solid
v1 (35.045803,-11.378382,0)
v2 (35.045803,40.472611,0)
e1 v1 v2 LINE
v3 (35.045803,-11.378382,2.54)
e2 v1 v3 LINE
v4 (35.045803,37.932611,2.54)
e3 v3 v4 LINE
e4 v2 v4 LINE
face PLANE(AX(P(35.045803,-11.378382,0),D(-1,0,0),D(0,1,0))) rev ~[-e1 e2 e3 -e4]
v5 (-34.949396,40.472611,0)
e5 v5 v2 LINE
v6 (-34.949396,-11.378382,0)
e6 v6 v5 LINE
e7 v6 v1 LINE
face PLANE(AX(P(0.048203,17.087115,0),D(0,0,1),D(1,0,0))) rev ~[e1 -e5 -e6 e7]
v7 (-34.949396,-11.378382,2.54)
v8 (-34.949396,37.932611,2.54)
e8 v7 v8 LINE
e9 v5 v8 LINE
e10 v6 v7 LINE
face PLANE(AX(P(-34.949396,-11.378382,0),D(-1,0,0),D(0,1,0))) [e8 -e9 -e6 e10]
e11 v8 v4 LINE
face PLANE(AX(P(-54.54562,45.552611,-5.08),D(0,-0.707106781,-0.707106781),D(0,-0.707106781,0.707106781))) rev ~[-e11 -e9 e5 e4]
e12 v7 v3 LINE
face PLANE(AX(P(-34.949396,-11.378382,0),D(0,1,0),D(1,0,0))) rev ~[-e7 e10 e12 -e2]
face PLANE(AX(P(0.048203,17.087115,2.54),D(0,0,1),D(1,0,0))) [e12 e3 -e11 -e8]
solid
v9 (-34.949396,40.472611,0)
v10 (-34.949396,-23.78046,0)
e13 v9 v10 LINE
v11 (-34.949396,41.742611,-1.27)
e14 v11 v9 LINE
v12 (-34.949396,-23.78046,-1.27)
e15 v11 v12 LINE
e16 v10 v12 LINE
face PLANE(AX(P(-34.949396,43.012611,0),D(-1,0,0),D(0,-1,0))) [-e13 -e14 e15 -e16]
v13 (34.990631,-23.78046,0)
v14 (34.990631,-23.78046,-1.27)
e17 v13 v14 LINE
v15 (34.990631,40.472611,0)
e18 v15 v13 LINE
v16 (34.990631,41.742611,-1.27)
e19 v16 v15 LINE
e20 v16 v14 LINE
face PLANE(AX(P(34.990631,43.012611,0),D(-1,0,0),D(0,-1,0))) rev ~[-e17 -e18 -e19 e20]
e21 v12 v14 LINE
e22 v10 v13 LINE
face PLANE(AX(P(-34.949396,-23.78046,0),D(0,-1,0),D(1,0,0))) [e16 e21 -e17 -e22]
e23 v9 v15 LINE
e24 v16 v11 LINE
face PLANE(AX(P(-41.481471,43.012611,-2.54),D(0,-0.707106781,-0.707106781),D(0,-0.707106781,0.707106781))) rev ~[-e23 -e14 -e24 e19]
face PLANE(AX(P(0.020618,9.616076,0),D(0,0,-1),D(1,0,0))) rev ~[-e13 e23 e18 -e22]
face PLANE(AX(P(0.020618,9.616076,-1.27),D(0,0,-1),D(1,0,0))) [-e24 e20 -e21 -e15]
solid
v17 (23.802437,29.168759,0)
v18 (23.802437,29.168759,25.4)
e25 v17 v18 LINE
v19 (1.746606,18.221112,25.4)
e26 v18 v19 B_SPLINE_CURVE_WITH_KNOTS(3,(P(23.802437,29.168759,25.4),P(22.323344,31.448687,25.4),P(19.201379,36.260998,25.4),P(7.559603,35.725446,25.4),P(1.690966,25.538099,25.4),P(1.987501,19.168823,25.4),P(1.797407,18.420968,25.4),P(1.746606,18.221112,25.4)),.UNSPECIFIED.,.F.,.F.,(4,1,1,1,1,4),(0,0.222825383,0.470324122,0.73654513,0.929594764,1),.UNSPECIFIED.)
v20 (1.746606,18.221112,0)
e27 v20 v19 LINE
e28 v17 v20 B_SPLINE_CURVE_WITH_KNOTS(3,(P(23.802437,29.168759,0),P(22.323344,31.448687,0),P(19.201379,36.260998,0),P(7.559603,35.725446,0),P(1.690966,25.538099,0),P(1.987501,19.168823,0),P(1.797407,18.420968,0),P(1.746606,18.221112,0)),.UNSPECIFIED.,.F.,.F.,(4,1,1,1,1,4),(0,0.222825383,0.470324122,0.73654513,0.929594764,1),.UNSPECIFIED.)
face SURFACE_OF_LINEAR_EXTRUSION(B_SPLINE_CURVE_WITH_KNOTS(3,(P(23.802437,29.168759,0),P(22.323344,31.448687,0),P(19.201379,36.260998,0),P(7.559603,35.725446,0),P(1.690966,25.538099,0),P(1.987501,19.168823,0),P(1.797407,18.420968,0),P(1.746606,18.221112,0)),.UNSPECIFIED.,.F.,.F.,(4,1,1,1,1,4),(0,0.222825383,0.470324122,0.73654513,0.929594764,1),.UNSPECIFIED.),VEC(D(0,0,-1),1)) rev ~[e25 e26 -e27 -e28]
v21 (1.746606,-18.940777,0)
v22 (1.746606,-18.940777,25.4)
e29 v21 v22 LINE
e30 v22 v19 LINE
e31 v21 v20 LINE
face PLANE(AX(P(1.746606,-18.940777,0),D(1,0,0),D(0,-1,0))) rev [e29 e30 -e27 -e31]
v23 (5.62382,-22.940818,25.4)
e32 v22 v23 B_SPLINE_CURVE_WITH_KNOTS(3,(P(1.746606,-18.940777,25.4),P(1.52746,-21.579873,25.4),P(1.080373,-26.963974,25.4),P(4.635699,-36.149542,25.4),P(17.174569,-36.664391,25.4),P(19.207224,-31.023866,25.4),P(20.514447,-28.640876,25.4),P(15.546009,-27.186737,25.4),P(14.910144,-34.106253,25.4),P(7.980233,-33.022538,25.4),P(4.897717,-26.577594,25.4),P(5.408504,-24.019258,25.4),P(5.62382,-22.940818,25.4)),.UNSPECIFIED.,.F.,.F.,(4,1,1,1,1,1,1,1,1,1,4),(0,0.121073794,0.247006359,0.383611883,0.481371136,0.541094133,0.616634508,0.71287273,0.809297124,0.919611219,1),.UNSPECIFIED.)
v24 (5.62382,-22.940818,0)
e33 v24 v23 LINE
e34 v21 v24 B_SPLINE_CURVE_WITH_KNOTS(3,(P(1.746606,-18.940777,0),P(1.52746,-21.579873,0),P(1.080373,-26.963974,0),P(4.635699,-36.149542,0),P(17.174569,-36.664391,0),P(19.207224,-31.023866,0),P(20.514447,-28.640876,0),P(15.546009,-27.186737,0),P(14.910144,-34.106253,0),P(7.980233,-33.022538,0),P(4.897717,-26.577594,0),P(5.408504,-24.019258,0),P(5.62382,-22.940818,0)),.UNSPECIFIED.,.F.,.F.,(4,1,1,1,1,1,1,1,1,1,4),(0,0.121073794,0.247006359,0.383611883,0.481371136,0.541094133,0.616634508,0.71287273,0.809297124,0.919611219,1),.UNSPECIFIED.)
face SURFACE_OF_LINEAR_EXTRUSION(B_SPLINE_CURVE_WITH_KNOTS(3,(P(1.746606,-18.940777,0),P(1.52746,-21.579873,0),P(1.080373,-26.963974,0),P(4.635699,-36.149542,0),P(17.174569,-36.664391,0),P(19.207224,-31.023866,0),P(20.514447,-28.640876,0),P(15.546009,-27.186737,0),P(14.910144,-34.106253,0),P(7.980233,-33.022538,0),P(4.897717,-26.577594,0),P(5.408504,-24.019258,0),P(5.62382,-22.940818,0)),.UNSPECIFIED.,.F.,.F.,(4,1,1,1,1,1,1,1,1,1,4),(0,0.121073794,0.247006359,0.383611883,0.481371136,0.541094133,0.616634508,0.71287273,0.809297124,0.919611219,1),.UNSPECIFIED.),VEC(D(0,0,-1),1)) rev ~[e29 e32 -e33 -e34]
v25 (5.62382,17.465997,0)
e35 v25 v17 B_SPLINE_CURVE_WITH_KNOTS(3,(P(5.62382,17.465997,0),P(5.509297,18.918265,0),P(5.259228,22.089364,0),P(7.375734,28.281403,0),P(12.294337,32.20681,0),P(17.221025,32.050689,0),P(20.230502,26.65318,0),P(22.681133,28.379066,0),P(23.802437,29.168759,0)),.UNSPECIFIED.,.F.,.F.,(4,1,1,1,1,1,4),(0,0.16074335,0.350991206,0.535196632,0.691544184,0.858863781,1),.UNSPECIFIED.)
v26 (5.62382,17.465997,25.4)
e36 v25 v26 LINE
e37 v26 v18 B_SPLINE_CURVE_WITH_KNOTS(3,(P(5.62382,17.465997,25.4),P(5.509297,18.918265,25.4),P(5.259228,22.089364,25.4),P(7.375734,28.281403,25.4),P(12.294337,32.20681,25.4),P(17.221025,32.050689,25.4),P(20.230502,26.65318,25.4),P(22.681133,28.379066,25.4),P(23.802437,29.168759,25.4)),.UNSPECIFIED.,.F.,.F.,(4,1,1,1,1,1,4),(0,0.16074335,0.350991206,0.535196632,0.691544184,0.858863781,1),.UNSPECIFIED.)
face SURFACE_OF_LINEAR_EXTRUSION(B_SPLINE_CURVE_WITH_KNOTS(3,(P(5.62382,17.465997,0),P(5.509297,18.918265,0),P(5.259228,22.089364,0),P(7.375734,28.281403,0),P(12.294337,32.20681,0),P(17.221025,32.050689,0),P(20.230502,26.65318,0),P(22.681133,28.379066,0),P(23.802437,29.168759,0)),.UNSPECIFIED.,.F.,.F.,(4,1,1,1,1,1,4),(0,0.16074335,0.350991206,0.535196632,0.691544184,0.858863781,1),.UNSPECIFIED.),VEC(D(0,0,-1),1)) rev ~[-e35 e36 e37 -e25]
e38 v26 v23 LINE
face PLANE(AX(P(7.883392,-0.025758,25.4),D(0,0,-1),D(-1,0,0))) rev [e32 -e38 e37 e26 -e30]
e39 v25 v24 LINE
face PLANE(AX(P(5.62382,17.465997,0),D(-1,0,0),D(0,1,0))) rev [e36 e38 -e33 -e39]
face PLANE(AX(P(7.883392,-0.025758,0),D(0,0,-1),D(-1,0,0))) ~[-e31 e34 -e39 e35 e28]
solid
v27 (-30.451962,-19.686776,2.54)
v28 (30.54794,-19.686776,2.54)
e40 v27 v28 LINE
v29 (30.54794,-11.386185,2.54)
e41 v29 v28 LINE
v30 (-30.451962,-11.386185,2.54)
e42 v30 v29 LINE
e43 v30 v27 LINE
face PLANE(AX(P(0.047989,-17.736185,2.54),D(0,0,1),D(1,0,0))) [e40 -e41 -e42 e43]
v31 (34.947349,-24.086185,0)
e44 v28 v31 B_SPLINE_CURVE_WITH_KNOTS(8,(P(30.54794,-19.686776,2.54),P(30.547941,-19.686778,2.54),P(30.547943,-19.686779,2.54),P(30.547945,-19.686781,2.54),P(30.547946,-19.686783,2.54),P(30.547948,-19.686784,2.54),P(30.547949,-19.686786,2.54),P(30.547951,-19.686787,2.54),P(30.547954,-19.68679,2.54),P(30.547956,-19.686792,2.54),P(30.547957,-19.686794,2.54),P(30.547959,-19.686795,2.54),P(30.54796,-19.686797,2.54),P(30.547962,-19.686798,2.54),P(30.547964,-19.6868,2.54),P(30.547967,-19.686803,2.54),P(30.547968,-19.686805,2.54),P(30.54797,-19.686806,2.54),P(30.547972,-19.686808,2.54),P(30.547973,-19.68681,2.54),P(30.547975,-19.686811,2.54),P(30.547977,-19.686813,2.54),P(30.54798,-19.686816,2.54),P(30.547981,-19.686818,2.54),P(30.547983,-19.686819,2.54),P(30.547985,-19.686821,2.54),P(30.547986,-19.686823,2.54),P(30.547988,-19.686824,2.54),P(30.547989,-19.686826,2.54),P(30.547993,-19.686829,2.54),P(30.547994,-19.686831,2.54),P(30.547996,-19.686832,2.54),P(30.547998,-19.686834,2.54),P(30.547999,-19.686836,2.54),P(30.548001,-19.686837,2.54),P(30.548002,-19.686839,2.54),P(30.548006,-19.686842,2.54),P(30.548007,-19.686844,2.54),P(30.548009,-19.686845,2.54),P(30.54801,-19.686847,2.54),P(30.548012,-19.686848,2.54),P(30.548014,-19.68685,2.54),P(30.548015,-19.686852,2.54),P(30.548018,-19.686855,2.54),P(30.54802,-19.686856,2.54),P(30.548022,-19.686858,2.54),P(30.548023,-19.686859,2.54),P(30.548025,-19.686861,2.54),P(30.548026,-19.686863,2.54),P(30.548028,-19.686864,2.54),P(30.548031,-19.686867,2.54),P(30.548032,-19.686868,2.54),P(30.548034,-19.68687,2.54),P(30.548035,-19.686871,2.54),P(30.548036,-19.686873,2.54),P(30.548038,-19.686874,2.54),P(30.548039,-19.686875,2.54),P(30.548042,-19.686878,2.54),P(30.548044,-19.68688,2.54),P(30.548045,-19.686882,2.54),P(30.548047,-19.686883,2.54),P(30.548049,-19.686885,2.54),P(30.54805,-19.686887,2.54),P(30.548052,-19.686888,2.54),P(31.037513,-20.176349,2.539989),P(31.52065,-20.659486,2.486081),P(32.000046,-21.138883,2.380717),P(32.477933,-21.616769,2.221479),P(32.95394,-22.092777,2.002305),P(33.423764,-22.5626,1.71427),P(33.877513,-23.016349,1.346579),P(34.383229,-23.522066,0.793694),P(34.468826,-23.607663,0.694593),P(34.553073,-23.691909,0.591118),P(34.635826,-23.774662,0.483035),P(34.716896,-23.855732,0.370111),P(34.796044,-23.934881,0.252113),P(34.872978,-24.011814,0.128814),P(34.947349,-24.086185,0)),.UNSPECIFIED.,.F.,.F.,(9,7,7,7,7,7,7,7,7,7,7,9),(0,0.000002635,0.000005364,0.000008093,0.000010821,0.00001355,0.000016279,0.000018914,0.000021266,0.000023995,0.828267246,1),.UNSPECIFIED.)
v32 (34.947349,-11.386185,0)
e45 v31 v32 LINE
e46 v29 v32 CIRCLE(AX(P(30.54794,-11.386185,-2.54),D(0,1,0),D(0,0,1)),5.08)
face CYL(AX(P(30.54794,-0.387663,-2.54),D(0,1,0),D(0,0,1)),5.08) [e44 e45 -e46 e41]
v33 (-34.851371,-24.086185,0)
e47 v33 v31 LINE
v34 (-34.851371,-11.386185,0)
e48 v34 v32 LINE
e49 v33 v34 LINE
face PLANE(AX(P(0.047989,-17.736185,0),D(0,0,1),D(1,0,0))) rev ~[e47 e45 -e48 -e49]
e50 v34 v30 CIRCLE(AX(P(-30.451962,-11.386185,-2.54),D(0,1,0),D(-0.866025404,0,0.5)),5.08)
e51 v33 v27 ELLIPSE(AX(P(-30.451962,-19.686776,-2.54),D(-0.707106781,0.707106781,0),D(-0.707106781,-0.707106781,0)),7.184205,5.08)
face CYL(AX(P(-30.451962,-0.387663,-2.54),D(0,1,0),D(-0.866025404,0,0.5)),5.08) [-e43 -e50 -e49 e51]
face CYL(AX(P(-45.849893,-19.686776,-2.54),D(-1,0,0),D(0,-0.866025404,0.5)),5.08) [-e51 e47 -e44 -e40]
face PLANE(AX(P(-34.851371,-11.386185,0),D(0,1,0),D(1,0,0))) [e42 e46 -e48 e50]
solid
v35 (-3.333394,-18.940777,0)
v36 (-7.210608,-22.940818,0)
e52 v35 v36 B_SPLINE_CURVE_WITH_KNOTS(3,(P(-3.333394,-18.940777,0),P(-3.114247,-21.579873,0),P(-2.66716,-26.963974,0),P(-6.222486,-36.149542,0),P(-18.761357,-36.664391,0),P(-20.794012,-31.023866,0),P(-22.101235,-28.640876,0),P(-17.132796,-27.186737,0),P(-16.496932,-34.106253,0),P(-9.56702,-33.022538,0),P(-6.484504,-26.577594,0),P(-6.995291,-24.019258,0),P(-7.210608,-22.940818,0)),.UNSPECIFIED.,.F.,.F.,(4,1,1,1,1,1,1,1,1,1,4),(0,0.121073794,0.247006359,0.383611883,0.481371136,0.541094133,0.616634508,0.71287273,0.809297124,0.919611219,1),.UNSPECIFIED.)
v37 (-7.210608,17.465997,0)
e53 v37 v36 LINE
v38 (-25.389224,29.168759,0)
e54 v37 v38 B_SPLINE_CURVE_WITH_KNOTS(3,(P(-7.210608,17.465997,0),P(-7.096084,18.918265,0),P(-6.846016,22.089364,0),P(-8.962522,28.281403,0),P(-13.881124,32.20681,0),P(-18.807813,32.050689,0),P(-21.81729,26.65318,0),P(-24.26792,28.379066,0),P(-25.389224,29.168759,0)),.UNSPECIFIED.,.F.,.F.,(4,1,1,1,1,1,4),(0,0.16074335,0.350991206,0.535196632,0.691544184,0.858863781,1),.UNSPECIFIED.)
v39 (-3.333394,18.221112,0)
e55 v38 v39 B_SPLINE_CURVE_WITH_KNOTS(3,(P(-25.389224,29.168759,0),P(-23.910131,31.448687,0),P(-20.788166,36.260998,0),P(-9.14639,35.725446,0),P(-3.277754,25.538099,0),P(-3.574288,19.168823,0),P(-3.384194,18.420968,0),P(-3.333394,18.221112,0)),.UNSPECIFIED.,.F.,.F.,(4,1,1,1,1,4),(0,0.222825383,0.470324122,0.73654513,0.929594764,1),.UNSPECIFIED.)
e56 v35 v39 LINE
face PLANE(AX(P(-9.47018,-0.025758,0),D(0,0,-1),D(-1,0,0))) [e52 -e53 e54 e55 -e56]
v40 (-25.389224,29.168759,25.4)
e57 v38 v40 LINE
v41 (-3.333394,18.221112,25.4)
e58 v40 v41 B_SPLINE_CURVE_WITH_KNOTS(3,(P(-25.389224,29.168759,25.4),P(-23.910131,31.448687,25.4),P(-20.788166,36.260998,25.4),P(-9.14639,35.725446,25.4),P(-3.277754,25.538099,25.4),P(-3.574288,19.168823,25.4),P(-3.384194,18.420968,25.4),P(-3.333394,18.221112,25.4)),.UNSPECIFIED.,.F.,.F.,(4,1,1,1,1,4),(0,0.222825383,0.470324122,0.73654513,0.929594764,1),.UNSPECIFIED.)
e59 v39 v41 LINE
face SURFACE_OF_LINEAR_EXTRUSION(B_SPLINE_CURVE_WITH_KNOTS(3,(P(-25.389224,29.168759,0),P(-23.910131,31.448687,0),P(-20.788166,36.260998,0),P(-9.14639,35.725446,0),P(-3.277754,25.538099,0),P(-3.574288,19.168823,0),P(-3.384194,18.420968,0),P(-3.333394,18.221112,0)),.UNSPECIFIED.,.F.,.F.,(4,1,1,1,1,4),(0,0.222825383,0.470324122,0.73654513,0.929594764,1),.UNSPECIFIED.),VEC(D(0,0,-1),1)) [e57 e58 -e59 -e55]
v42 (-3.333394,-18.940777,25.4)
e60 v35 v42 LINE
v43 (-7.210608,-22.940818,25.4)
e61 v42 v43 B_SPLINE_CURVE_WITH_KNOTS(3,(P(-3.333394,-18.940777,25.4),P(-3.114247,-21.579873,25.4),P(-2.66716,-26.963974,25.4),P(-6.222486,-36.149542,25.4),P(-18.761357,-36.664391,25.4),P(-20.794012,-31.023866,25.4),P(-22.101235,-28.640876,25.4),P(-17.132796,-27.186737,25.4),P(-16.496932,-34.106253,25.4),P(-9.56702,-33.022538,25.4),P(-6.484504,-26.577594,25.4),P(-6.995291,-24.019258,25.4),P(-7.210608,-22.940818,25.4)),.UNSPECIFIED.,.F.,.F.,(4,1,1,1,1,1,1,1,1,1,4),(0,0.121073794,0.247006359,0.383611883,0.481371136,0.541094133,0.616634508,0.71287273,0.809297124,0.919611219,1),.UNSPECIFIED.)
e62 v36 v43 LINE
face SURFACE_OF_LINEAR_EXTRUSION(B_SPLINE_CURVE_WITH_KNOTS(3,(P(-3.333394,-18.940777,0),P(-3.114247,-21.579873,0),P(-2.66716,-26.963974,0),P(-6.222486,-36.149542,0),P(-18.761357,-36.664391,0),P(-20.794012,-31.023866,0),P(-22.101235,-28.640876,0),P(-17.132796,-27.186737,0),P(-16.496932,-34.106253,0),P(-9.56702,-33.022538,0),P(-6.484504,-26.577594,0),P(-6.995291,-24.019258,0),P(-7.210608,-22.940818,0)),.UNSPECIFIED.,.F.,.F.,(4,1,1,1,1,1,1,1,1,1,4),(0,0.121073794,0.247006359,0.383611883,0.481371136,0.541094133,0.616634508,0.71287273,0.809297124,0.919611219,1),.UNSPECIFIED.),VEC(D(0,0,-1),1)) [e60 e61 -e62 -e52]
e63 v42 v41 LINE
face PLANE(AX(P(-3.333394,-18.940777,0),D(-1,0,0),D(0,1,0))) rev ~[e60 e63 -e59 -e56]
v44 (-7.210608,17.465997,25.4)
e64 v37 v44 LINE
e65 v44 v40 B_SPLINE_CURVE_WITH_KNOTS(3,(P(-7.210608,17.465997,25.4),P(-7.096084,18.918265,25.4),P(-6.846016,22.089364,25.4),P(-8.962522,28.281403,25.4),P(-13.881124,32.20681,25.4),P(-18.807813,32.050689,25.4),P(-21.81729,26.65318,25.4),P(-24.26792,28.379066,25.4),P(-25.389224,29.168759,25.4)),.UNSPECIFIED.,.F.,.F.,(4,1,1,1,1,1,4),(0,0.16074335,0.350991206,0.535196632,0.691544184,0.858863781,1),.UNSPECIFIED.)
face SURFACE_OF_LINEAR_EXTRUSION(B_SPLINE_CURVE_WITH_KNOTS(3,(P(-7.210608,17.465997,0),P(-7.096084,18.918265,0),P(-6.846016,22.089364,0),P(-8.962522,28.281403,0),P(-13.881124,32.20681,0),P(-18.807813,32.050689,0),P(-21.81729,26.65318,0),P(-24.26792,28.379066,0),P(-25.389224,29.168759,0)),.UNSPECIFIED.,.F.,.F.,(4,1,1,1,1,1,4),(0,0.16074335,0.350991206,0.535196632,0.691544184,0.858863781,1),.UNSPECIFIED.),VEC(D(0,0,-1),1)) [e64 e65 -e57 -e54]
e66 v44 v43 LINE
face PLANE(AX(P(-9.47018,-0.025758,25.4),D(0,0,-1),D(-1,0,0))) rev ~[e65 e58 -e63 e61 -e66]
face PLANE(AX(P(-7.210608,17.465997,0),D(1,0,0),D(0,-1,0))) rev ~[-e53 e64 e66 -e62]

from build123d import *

# Parameters (mm, degrees)
F1_DEPTH     = 25.4
F4_W         = 69.7987195548
F4_H         = 12.7
F5_DEPTH     = 2.54
F6_T1_DEPTH  = 91.7957648109
F7_T1_DEPTH  = 30.2976362049
F8_T1_DEPTH  = 30.2976362049
F9_W         = 69.9951983988
F9_H         = 56.9309936836
F10_DEPTH    = 2.54
F11_W        = 69.9400268495
F11_H        = 66.7930708891
F12_DEPTH    = 1.27
F13_T1_DEPTH = 109.1876471354
F14_T1_DEPTH = 83.0041764284


# Not quite as in the source:
# - a fillet or chamfer that OpenCascade refuses, or shapes differently, is made with other operations: its cross-section is extruded or revolved along the edge and cut away or added


with BuildPart() as f1:
    # F0 (on Top) → F1 (new body)
    with BuildSketch(Plane.XY):
        with BuildLine():
            add(Edge.make_bspline(
                [(-25.3892242908, 29.1687585413), (-23.9101314013, 31.4486866753), (-20.7881663251, 36.2609983704), (-9.1463899399, 35.7254461506), (-3.2777537007, 25.5380991998), (-3.5742881653, 19.1688234613), (-3.3841941276, 18.4209676857), (-3.3333937172, 18.2211119682)],
                knots=[0, 0, 0, 0, 0.2228253831, 0.4703241216, 0.7365451299, 0.9295947644, 1, 1, 1, 1], degree=3))
            add(Edge.make_bspline(
                [(-7.2106076404, 17.4659974873), (-7.0960839892, 18.9182648401), (-6.8460158254, 22.0893637897), (-8.9625216947, 28.2814027293), (-13.8811242457, 32.206810347), (-18.8078127809, 32.0506891323), (-21.8172896516, 26.6531796951), (-24.2679202869, 28.3790664228), (-25.3892242908, 29.1687585413)],
                knots=[0, 0, 0, 0, 0.1607433504, 0.3509912061, 0.535196632, 0.6915441839, 0.8588637812, 1, 1, 1, 1], degree=3))
            Line((-7.2106076404, 17.4659974873), (-7.2106076404, -22.9408182204))
            add(Edge.make_bspline(
                [(-3.3333937172, -18.9407765865), (-3.1142473062, -21.5798728563), (-2.6671599952, -26.9639740582), (-6.2224863176, -36.1495419675), (-18.7613568768, -36.6643913981), (-20.7940116277, -31.023866226), (-22.1012345625, -28.6408761942), (-17.1327960007, -27.1867369593), (-16.4969316925, -34.1062525933), (-9.5670200889, -33.0225376657), (-6.484504483, -26.5775936324), (-6.9952909898, -24.0192576859), (-7.2106076404, -22.9408182204)],
                knots=[0, 0, 0, 0, 0.1210737943, 0.2470063593, 0.3836118826, 0.4813711357, 0.5410941326, 0.6166345084, 0.7128727302, 0.8092971236, 0.919611219, 1, 1, 1, 1], degree=3))
            Line((-3.3333937172, -18.9407765865), (-3.3333937172, 18.2211119682))
        make_face()
    extrude(amount=F1_DEPTH)


with BuildPart() as f3_1:
    # F3: instance of F1
    add(f1.part.mirror(Plane(origin=(-0.7933937172, -0.3598323092, 12.7), x_dir=(0, 1, 0), z_dir=(1, 0, 0))))


with BuildPart() as f5:
    # F4 (on Top) → F5 (new body)
    with BuildSketch(Plane.XY):
        with Locations((0.0479891896, -17.7361853421)):
            Rectangle(F4_W, F4_H)
    extrude(amount=F5_DEPTH)

    # F6: fillet of radius 5.08 on 1 edges, made by hand

    # F6_s2 → F6_t1 (cut)
    with BuildSketch(Plane.YZ.offset(-45.8498932158)):
        with BuildLine():
            ThreePointArc((-24.0861853421, 0), (-22.2267762908, 1.8594090512), (-19.6867762908, 2.54))
            Line((-19.6867762908, 2.54), (-24.0861853421, 2.54))
            Line((-24.0861853421, 2.54), (-24.0861853421, 0))
        make_face()
    extrude(amount=F6_T1_DEPTH, mode=Mode.SUBTRACT)

    # F7: fillet of radius 5.08 on 1 edges, made by hand

    # F7_s2 → F7_t1 (cut)
    with BuildSketch(Plane.XZ.offset(0.387662714)):
        with BuildLine():
            ThreePointArc((-34.8513705878, 0), (-32.9919615365, 1.8594090512), (-30.4519615365, 2.54))
            Line((-30.4519615365, 2.54), (-34.8513705878, 2.54))
            Line((-34.8513705878, 2.54), (-34.8513705878, 0))
        make_face()
    extrude(amount=F7_T1_DEPTH, mode=Mode.SUBTRACT)

    # F8: fillet of radius 5.08 on 1 edges, made by hand

    # F8_s2 → F8_t1 (cut)
    with BuildSketch(Plane.XZ.offset(0.387662714)):
        with BuildLine():
            ThreePointArc((30.5479399158, 2.54), (33.0879399158, 1.8594090512), (34.947348967, 0))
            Line((34.947348967, 0), (34.947348967, 2.54))
            Line((34.947348967, 2.54), (30.5479399158, 2.54))
        make_face()
    extrude(amount=F8_T1_DEPTH, mode=Mode.SUBTRACT)


with BuildPart() as f10:
    # F9 (on Top) → F10 (new body)
    with BuildSketch(Plane.XY):
        with Locations((0.0482033938, 17.0871145092)):
            Rectangle(F9_W, F9_H)
    extrude(amount=F10_DEPTH)

    # F13: chamfer of 7.62 on 1 edges, made by hand

    # F13_s2 → F13_t1 (cut)
    with BuildSketch(Plane.YZ.offset(-54.5456201739)):
        Polygon((45.552611351, -5.08), (37.932611351, 2.54), (45.552611351, 2.54), align=None)
    extrude(amount=F13_T1_DEPTH, mode=Mode.SUBTRACT)


with BuildPart() as f12:
    # F11 (on face) → F12 (new body)
    with BuildSketch(Plane(origin=(0, 0, 0), x_dir=(1, 0, 0), z_dir=(0, 0, -1))):
        with Locations((0.0206176192, -9.6160759065)):
            Rectangle(F11_W, F11_H)
    extrude(amount=F12_DEPTH)

    # F14: chamfer of 2.54 on 1 edges, made by hand

    # F14_s2 → F14_t1 (cut)
    with BuildSketch(Plane.YZ.offset(-41.481470595)):
        Polygon((43.012611351, -2.54), (40.472611351, 0), (43.012611351, 0), align=None)
    extrude(amount=F14_T1_DEPTH, mode=Mode.SUBTRACT)


solid = Compound([f1.part, f3_1.part, f5.part, f10.part, f12.part])
